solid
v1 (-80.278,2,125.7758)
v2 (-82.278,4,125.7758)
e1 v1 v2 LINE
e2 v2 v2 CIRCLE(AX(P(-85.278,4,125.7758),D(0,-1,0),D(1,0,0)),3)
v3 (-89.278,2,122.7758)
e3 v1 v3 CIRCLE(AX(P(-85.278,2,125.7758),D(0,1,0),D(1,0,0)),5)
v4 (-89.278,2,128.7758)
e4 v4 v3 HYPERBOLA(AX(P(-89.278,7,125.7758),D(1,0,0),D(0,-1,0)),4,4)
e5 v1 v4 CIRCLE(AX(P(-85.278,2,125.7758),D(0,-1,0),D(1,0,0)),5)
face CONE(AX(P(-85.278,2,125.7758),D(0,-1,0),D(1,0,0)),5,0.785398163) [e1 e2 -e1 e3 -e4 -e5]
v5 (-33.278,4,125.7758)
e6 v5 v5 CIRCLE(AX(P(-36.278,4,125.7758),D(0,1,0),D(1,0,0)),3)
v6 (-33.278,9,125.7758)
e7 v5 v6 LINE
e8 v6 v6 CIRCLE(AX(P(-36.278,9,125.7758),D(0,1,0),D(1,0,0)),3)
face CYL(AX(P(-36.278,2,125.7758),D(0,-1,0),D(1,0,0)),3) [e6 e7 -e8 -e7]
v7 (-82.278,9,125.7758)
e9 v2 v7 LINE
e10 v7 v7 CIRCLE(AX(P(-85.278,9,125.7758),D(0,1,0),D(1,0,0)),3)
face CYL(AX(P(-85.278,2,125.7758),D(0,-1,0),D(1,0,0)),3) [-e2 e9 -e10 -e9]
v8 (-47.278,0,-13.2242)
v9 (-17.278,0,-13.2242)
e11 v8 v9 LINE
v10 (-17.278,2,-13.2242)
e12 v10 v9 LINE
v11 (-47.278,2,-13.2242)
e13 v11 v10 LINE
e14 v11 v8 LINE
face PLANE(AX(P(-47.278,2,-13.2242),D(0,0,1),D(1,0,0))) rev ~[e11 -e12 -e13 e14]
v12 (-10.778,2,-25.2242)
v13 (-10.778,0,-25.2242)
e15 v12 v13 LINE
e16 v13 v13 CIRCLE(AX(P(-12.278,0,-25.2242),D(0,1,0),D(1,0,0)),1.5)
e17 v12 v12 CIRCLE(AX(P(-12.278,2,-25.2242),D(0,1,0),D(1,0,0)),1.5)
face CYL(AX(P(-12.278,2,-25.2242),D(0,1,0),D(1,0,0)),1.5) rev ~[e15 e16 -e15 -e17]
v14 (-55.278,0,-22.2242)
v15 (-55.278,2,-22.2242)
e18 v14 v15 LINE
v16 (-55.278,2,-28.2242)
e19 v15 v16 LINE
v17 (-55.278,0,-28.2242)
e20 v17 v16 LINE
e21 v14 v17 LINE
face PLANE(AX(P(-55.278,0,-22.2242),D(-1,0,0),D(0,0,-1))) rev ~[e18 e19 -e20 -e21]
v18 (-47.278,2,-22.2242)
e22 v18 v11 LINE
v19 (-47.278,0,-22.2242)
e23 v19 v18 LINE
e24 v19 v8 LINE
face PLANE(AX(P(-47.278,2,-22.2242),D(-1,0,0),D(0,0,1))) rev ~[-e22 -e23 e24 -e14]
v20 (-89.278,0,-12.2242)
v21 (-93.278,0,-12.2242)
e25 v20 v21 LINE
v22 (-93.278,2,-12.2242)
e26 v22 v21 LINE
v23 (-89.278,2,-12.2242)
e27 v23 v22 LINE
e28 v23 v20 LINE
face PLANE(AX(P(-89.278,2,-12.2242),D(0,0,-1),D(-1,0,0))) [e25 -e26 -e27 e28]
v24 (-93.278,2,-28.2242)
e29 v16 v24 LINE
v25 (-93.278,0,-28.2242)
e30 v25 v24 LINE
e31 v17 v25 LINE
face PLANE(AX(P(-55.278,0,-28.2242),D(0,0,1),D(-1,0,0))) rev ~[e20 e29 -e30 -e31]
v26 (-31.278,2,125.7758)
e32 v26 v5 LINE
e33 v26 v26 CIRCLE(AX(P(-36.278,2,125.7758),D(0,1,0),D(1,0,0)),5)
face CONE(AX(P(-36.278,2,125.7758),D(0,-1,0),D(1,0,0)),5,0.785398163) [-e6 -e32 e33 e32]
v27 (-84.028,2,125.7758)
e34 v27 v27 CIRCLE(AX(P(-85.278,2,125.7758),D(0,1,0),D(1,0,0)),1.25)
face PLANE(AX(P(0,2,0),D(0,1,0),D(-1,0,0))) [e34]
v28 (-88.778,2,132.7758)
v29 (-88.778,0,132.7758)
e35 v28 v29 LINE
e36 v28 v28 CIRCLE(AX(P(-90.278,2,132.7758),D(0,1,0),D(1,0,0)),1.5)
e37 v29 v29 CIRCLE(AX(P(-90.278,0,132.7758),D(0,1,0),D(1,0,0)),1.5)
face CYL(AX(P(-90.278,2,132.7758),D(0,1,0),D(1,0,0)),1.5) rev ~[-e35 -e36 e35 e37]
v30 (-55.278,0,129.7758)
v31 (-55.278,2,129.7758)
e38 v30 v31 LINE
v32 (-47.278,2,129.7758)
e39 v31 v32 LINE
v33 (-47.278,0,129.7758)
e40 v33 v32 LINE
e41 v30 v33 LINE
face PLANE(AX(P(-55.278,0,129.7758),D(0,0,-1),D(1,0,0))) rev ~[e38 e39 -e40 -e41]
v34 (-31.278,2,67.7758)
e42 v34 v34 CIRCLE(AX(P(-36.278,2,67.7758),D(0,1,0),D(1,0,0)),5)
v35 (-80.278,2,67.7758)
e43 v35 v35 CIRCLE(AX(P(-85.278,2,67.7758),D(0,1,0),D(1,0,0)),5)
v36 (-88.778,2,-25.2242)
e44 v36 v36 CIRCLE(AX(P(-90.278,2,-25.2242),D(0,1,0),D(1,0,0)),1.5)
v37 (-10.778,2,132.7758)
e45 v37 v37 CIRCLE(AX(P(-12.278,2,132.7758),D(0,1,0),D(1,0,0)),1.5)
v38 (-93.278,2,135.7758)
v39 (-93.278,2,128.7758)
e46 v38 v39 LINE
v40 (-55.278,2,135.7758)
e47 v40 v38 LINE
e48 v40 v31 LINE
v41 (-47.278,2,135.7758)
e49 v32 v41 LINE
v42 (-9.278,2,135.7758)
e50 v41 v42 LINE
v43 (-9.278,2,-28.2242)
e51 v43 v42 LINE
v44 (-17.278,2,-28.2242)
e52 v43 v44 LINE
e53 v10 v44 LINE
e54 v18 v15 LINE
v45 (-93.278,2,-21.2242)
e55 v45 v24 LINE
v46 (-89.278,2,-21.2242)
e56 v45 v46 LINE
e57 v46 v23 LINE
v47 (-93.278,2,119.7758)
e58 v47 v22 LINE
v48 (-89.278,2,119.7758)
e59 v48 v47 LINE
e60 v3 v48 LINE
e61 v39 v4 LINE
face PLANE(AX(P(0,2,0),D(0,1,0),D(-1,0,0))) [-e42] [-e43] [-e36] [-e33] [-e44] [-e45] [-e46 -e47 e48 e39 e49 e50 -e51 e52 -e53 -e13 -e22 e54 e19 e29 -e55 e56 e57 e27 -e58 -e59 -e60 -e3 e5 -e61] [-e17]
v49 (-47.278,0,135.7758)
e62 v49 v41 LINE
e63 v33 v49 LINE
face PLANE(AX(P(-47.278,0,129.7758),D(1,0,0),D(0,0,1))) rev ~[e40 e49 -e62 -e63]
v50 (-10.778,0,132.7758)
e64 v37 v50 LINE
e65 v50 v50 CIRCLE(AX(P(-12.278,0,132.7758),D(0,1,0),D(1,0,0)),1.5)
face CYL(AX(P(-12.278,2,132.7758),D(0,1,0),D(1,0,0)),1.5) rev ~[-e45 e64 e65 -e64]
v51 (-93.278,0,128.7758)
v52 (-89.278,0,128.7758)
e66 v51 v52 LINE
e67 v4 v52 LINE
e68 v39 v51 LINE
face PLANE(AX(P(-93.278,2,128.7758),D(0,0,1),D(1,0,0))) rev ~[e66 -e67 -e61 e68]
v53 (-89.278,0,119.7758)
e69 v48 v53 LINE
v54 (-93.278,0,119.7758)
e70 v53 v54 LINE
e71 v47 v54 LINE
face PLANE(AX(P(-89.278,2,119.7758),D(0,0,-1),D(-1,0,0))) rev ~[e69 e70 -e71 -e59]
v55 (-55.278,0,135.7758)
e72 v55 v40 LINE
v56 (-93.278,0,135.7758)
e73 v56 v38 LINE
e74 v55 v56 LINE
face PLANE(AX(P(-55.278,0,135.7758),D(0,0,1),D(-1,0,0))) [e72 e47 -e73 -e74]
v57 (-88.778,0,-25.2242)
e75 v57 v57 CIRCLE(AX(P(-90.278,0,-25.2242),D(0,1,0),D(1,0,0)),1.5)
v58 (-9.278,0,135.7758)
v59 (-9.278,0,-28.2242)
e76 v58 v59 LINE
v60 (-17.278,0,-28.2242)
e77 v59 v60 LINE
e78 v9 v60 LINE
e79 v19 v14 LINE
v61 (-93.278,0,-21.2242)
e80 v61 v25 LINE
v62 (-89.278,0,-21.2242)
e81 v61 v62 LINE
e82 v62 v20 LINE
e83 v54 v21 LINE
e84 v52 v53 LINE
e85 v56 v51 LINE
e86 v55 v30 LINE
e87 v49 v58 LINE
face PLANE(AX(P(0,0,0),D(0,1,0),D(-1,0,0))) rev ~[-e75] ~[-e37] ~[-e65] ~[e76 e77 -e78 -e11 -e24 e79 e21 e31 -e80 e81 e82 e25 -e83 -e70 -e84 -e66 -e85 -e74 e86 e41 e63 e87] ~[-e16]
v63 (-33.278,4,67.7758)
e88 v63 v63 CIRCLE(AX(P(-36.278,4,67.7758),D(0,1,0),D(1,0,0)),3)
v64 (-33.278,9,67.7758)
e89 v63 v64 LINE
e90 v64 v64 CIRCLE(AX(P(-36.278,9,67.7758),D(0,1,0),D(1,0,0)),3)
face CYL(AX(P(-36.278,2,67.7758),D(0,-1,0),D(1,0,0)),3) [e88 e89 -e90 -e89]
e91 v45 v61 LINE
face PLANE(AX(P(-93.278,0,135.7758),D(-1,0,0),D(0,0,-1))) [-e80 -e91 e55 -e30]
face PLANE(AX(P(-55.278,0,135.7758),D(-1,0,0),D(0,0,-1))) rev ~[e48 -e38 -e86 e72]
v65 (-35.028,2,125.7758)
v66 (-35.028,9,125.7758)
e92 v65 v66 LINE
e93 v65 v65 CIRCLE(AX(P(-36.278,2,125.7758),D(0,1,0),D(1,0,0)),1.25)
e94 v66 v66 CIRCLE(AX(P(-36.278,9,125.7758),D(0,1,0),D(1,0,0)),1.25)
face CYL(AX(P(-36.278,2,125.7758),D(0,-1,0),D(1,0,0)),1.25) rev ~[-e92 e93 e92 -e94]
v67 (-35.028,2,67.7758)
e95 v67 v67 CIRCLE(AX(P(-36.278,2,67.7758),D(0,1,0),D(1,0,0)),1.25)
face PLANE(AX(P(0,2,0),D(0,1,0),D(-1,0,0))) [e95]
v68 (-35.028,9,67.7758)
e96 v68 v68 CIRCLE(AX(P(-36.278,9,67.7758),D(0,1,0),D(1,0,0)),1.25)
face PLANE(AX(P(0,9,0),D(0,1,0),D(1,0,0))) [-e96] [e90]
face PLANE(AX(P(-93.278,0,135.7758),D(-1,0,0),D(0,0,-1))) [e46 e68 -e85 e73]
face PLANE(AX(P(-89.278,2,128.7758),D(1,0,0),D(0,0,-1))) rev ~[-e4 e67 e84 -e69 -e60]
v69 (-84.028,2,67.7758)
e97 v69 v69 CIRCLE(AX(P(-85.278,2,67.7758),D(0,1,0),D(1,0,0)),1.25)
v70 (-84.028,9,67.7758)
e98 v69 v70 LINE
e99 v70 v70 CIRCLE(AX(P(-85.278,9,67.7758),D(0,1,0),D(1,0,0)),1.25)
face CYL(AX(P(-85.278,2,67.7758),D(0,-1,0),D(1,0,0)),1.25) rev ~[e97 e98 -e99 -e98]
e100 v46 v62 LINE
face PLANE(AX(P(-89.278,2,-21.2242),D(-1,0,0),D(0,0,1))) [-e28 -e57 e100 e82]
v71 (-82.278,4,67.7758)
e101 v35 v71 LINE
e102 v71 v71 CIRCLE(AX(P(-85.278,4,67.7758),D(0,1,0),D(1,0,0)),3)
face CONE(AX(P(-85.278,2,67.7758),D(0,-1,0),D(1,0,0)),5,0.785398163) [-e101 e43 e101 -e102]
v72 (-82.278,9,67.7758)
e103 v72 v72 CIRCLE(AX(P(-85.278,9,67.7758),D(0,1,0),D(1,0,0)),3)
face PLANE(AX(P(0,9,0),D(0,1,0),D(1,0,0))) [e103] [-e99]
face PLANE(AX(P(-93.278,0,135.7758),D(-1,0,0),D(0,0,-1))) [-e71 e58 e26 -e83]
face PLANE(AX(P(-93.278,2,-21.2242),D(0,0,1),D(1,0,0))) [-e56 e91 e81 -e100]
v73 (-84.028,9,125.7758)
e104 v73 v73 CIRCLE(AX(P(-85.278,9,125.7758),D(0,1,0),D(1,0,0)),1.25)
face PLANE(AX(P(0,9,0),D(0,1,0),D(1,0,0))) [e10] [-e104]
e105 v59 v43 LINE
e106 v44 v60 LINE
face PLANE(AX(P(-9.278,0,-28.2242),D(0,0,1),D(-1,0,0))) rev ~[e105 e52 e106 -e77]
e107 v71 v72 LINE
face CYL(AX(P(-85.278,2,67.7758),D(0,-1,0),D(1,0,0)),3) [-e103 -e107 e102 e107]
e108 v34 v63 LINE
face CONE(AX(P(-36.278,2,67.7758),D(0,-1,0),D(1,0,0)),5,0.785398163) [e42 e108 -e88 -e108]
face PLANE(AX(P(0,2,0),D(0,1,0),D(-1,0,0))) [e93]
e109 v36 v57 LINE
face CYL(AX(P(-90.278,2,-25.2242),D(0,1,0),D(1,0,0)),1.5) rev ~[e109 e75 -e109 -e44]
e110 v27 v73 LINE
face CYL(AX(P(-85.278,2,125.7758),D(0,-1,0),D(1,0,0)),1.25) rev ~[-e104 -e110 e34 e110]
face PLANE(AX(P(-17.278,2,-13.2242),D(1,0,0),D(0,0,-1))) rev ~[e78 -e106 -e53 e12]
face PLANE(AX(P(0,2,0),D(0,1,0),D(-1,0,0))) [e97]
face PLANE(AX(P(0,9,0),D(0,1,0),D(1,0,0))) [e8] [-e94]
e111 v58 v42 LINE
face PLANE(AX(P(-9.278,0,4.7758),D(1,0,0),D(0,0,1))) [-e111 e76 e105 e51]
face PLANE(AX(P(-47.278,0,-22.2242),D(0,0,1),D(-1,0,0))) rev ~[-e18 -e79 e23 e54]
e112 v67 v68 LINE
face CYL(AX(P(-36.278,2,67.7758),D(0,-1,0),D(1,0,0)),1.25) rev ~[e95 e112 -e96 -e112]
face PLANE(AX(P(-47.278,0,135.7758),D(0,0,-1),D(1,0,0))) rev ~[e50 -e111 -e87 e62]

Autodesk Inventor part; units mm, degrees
ref_plane "YZ Plane" through (0, 0, 0) normal (1, 0, 0) x (0, 1, 0)
ref_plane "XZ Plane" through (0, 0, 0) normal (0, 1, 0) x (-1, 0, 0)
ref_plane "XY Plane" through (0, 0, 0) normal (0, 0, 1) x (1, 0, 0)
sketch "Sketch1" plane through (0, 0, 0) normal (0, 1, 0) x (-1, 0, 0)
  line L0 (9.278, 4.7758) -> (9.278, -28.2242)
  line L1 (9.278, -28.2242) -> (47.278, -28.2242)
  line L2 (47.278, -28.2242) -> (47.278, -22.2242)
  line L3 (47.278, -22.2242) -> (55.278, -22.2242)
  line L4 (55.278, -22.2242) -> (55.278, -28.2242)
  line L5 (55.278, 135.7758) -> (55.278, 129.7758)
  line L6 (55.278, 129.7758) -> (47.278, 129.7758)
  line L7 (47.278, 129.7758) -> (47.278, 135.7758)
  line L8 (47.278, 135.7758) -> (9.278, 135.7758)
  line L9 (9.278, 135.7758) -> (9.278, 102.7758)
  line L10 (9.278, 4.7758) -> (9.278, 4.7758)
  line L11 (9.278, 4.7758) -> (9.278, 102.7758)
  line L12 (9.278, 102.7758) -> (9.278, 102.7758)
  line L13 (54.278, 130.7758) -> (54.278, 136.7758)
  line L14 (8.278, 136.7758) -> (94.278, 136.7758)
  line L15 (94.278, -29.2242) -> (8.278, -29.2242)
  line L16 (54.278, -29.2242) -> (54.278, -23.2242)
  line L17 (54.278, -23.2242) -> (48.278, -23.2242)
  line L18 (48.278, -23.2242) -> (48.278, -29.2242)
  line L19 (8.278, -29.2242) -> (8.278, 3.7758)
  line L20 (8.278, 103.7758) -> (8.278, 136.7758)
  line L21 (48.278, 136.7758) -> (48.278, 130.7758)
  line L22 (8.278, 103.7758) -> (8.278, 3.7758)
  line L23 (54.278, 130.7758) -> (48.278, 130.7758)
  line L24 (94.278, -29.2242) -> (94.278, 136.7758)
  line L25 (55.278, 135.7758) -> (94.278, 135.7758)
  line L26 (55.278, -28.2242) -> (94.278, -28.2242)
  line L27 (94.278, 135.7758) -> (93.278, 135.7758)
  line L28 (93.278, 135.7758) -> (93.278, -28.2242)
  line L29 (93.278, -28.2242) -> (94.278, -28.2242)
  line L30 (94.278, -28.2242) -> (94.278, 135.7758)
  line L31 (8.278, 3.7758) -> (8.278, 3.7758)
  line L32 (8.278, 103.7758) -> (8.278, 103.7758)
  point P0 (0, 0)
  point P1 (0, 0)
  dimension "d0" = 1
  dimension "d4" = 1
  dimension "d5" = 1
  dimension "d6" = 1
  dimension "d7" = 1
  dimension "d10" = 1
  dimension "d12" = 1
  dimension "d13" = 1
  dimension "d14" = 1
  dimension "d15" = 1
  dimension "d16" = 6
  dimension "d17" = 0
  dimension "d18" = 0
  dimension "d25" = 1
  dimension "d75" = 164
  dimension "d76" = 164
  dimension "d77" = 166
  dimension "d79" = 33
  dimension "d82" = 33
  dimension "d95" = 0
  dimension "d96" = 86
  dimension "d97" = 1
  dimension "d98" = 86
extrude "Extrusion2" add sketch "Sketch1" along normal blind 2 contours L11 L9 L8 L7 L6 L5 L25 L28 L26 L4 L3 L2 L1 L0
sketch "Sketch2" plane through (0, 2, 0) normal (0, 1, 0) x (1, 0, 0)
  circle A0 centre (-12.278, 25.2242) radius 1.5
  line L0 (-9.278, -135.7758) -> (-9.278, 28.2242) projected
  line L1 (-9.278, 28.2242) -> (-47.278, 28.2242) projected
  line L2 (-47.278, 22.2242) -> (-55.278, 22.2242) projected
  line L3 (-51.278, 22.2242) -> (-51.278, -30.1136)
  circle A1 centre (-90.278, 25.2242) radius 1.5
  line L4 (-9.278, -135.7758) -> (-9.278, 28.2242) projected
  line L5 (-9.278, -53.7758) -> (-80.3163, -53.7758)
  circle A2 centre (-12.278, -132.7758) radius 1.5
  circle A3 centre (-90.278, -132.7758) radius 1.5
  point P0 (0, 0)
  point P1 (-49.278, -4.7758)
  point P2 (-9.278, -102.7758)
  point P3 (-9.278, -4.7758)
  dimension "d26" = 3
  dimension "d27" = 3
  dimension "d28" = 3
extrude "Extrusion3" cut sketch "Sketch2" against normal blind 10
sketch "Sketch3" plane through (0, 2, 0) normal (0, 1, 0) x (1, 0, 0)
  circle A0 centre (-36.278, -67.7758) radius 1.25
  circle A1 centre (-36.278, -67.7758) radius 1.25
  circle A2 centre (-36.278, -125.7758) radius 1.25
  circle A3 centre (-36.278, -125.7758) radius 1.25
  circle A4 centre (-85.278, -67.7758) radius 1.25
  circle A5 centre (-85.278, -67.7758) radius 1.25
  circle A6 centre (-85.278, -125.7758) radius 1.25
  circle A7 centre (-85.278, -125.7758) radius 1.25
  line L0 (-47.278, -135.7758) -> (-9.278, -135.7758) projected
  line L1 (-93.278, 28.2242) -> (-93.278, -135.7758) projected
  circle A8 centre (-36.278, -67.7758) radius 3
  circle A9 centre (-36.278, -125.7758) radius 3
  circle A10 centre (-85.278, -67.7758) radius 3
  circle A11 centre (-85.278, -125.7758) radius 3
  point P0 (0, 0)
  point P1 (40, -28)
  dimension "d31" = 49
  dimension "d32" = 58
  dimension "d33" = 49
  dimension "d34" = 58
  dimension "d35" = 10
  dimension "d36" = 10
  dimension "d37" = 8
  dimension "d38" = 8
  dimension "d70" = 6
  dimension "d71" = 6
  dimension "d72" = 6
  dimension "d73" = 6
extrude "Extrusion4" add sketch "Sketch3" along normal blind 7
sketch "Sketch6" plane through (0, 2, 0) normal (0, 1, 0) x (1, 0, 0)
  line L0 (-93.278, 28.2242) -> (-93.278, -135.7758) projected
  line L1 (-93.278, 28.2242) -> (-93.278, 21.2242)
  line L2 (-93.278, 21.2242) -> (-89.278, 21.2242)
  line L3 (-89.278, 21.2242) -> (-89.278, 12.2242)
  line L4 (-89.278, 12.2242) -> (-93.278, 12.2242)
  line L5 (-93.278, 21.2242) -> (-93.278, 12.2242)
  line L6 (-93.278, -135.7758) -> (-93.278, -128.7758)
  line L7 (-93.278, -128.7758) -> (-89.278, -128.7758)
  line L8 (-89.278, -128.7758) -> (-89.278, -119.7758)
  line L9 (-89.278, -119.7758) -> (-93.278, -119.7758)
  line L10 (-93.278, -128.7758) -> (-93.278, -119.7758)
  point P0 (0, 0)
  dimension "d63" = 7
  dimension "d64" = 4
  dimension "d65" = 9
  dimension "d66" = 7
  dimension "d67" = 9
  dimension "d83" = 4
extrude "Extrusion7" cut sketch "Sketch6" against normal blind 10
sketch "Sketch7" plane through (0, 2, 0) normal (0, 1, 0) x (1, 0, 0)
  line L0 (-9.278, -135.7758) -> (-9.278, 28.2242) projected
  line L1 (-9.278, 28.2242) -> (-47.278, 28.2242) projected
  line L2 (-47.278, 28.2242) -> (-47.278, 22.2242) projected
  line L3 (-9.278, -135.7758) -> (-9.278, 28.2242) projected
  line L4 (-9.278, -4.7758) -> (-49.278, -4.7758) projected
  line L5 (-49.278, -102.7758) -> (-9.278, -102.7758) projected
  line L6 (-47.278, 28.2242) -> (-47.278, 13.2242)
  line L7 (-47.278, 13.2242) -> (-17.278, 13.2242)
  line L8 (-17.278, 13.2242) -> (-17.278, 28.2242)
  line L9 (-9.278, 28.2242) -> (-47.278, 28.2242) projected
  point P0 (0, 0)
  dimension "d94" = 15
extrude "Extrusion8" cut sketch "Sketch7" against normal blind 10
chamfer "Chamfer1" distance 2 angle 45 4 edges at (-88.278, 2, 67.7758) (-39.278, 2, 125.7758) (-39.278, 2, 67.7758) (-88.278, 2, 125.7758)
equation "\"d36\" = d35"
equation "\"d38\" = d37"
